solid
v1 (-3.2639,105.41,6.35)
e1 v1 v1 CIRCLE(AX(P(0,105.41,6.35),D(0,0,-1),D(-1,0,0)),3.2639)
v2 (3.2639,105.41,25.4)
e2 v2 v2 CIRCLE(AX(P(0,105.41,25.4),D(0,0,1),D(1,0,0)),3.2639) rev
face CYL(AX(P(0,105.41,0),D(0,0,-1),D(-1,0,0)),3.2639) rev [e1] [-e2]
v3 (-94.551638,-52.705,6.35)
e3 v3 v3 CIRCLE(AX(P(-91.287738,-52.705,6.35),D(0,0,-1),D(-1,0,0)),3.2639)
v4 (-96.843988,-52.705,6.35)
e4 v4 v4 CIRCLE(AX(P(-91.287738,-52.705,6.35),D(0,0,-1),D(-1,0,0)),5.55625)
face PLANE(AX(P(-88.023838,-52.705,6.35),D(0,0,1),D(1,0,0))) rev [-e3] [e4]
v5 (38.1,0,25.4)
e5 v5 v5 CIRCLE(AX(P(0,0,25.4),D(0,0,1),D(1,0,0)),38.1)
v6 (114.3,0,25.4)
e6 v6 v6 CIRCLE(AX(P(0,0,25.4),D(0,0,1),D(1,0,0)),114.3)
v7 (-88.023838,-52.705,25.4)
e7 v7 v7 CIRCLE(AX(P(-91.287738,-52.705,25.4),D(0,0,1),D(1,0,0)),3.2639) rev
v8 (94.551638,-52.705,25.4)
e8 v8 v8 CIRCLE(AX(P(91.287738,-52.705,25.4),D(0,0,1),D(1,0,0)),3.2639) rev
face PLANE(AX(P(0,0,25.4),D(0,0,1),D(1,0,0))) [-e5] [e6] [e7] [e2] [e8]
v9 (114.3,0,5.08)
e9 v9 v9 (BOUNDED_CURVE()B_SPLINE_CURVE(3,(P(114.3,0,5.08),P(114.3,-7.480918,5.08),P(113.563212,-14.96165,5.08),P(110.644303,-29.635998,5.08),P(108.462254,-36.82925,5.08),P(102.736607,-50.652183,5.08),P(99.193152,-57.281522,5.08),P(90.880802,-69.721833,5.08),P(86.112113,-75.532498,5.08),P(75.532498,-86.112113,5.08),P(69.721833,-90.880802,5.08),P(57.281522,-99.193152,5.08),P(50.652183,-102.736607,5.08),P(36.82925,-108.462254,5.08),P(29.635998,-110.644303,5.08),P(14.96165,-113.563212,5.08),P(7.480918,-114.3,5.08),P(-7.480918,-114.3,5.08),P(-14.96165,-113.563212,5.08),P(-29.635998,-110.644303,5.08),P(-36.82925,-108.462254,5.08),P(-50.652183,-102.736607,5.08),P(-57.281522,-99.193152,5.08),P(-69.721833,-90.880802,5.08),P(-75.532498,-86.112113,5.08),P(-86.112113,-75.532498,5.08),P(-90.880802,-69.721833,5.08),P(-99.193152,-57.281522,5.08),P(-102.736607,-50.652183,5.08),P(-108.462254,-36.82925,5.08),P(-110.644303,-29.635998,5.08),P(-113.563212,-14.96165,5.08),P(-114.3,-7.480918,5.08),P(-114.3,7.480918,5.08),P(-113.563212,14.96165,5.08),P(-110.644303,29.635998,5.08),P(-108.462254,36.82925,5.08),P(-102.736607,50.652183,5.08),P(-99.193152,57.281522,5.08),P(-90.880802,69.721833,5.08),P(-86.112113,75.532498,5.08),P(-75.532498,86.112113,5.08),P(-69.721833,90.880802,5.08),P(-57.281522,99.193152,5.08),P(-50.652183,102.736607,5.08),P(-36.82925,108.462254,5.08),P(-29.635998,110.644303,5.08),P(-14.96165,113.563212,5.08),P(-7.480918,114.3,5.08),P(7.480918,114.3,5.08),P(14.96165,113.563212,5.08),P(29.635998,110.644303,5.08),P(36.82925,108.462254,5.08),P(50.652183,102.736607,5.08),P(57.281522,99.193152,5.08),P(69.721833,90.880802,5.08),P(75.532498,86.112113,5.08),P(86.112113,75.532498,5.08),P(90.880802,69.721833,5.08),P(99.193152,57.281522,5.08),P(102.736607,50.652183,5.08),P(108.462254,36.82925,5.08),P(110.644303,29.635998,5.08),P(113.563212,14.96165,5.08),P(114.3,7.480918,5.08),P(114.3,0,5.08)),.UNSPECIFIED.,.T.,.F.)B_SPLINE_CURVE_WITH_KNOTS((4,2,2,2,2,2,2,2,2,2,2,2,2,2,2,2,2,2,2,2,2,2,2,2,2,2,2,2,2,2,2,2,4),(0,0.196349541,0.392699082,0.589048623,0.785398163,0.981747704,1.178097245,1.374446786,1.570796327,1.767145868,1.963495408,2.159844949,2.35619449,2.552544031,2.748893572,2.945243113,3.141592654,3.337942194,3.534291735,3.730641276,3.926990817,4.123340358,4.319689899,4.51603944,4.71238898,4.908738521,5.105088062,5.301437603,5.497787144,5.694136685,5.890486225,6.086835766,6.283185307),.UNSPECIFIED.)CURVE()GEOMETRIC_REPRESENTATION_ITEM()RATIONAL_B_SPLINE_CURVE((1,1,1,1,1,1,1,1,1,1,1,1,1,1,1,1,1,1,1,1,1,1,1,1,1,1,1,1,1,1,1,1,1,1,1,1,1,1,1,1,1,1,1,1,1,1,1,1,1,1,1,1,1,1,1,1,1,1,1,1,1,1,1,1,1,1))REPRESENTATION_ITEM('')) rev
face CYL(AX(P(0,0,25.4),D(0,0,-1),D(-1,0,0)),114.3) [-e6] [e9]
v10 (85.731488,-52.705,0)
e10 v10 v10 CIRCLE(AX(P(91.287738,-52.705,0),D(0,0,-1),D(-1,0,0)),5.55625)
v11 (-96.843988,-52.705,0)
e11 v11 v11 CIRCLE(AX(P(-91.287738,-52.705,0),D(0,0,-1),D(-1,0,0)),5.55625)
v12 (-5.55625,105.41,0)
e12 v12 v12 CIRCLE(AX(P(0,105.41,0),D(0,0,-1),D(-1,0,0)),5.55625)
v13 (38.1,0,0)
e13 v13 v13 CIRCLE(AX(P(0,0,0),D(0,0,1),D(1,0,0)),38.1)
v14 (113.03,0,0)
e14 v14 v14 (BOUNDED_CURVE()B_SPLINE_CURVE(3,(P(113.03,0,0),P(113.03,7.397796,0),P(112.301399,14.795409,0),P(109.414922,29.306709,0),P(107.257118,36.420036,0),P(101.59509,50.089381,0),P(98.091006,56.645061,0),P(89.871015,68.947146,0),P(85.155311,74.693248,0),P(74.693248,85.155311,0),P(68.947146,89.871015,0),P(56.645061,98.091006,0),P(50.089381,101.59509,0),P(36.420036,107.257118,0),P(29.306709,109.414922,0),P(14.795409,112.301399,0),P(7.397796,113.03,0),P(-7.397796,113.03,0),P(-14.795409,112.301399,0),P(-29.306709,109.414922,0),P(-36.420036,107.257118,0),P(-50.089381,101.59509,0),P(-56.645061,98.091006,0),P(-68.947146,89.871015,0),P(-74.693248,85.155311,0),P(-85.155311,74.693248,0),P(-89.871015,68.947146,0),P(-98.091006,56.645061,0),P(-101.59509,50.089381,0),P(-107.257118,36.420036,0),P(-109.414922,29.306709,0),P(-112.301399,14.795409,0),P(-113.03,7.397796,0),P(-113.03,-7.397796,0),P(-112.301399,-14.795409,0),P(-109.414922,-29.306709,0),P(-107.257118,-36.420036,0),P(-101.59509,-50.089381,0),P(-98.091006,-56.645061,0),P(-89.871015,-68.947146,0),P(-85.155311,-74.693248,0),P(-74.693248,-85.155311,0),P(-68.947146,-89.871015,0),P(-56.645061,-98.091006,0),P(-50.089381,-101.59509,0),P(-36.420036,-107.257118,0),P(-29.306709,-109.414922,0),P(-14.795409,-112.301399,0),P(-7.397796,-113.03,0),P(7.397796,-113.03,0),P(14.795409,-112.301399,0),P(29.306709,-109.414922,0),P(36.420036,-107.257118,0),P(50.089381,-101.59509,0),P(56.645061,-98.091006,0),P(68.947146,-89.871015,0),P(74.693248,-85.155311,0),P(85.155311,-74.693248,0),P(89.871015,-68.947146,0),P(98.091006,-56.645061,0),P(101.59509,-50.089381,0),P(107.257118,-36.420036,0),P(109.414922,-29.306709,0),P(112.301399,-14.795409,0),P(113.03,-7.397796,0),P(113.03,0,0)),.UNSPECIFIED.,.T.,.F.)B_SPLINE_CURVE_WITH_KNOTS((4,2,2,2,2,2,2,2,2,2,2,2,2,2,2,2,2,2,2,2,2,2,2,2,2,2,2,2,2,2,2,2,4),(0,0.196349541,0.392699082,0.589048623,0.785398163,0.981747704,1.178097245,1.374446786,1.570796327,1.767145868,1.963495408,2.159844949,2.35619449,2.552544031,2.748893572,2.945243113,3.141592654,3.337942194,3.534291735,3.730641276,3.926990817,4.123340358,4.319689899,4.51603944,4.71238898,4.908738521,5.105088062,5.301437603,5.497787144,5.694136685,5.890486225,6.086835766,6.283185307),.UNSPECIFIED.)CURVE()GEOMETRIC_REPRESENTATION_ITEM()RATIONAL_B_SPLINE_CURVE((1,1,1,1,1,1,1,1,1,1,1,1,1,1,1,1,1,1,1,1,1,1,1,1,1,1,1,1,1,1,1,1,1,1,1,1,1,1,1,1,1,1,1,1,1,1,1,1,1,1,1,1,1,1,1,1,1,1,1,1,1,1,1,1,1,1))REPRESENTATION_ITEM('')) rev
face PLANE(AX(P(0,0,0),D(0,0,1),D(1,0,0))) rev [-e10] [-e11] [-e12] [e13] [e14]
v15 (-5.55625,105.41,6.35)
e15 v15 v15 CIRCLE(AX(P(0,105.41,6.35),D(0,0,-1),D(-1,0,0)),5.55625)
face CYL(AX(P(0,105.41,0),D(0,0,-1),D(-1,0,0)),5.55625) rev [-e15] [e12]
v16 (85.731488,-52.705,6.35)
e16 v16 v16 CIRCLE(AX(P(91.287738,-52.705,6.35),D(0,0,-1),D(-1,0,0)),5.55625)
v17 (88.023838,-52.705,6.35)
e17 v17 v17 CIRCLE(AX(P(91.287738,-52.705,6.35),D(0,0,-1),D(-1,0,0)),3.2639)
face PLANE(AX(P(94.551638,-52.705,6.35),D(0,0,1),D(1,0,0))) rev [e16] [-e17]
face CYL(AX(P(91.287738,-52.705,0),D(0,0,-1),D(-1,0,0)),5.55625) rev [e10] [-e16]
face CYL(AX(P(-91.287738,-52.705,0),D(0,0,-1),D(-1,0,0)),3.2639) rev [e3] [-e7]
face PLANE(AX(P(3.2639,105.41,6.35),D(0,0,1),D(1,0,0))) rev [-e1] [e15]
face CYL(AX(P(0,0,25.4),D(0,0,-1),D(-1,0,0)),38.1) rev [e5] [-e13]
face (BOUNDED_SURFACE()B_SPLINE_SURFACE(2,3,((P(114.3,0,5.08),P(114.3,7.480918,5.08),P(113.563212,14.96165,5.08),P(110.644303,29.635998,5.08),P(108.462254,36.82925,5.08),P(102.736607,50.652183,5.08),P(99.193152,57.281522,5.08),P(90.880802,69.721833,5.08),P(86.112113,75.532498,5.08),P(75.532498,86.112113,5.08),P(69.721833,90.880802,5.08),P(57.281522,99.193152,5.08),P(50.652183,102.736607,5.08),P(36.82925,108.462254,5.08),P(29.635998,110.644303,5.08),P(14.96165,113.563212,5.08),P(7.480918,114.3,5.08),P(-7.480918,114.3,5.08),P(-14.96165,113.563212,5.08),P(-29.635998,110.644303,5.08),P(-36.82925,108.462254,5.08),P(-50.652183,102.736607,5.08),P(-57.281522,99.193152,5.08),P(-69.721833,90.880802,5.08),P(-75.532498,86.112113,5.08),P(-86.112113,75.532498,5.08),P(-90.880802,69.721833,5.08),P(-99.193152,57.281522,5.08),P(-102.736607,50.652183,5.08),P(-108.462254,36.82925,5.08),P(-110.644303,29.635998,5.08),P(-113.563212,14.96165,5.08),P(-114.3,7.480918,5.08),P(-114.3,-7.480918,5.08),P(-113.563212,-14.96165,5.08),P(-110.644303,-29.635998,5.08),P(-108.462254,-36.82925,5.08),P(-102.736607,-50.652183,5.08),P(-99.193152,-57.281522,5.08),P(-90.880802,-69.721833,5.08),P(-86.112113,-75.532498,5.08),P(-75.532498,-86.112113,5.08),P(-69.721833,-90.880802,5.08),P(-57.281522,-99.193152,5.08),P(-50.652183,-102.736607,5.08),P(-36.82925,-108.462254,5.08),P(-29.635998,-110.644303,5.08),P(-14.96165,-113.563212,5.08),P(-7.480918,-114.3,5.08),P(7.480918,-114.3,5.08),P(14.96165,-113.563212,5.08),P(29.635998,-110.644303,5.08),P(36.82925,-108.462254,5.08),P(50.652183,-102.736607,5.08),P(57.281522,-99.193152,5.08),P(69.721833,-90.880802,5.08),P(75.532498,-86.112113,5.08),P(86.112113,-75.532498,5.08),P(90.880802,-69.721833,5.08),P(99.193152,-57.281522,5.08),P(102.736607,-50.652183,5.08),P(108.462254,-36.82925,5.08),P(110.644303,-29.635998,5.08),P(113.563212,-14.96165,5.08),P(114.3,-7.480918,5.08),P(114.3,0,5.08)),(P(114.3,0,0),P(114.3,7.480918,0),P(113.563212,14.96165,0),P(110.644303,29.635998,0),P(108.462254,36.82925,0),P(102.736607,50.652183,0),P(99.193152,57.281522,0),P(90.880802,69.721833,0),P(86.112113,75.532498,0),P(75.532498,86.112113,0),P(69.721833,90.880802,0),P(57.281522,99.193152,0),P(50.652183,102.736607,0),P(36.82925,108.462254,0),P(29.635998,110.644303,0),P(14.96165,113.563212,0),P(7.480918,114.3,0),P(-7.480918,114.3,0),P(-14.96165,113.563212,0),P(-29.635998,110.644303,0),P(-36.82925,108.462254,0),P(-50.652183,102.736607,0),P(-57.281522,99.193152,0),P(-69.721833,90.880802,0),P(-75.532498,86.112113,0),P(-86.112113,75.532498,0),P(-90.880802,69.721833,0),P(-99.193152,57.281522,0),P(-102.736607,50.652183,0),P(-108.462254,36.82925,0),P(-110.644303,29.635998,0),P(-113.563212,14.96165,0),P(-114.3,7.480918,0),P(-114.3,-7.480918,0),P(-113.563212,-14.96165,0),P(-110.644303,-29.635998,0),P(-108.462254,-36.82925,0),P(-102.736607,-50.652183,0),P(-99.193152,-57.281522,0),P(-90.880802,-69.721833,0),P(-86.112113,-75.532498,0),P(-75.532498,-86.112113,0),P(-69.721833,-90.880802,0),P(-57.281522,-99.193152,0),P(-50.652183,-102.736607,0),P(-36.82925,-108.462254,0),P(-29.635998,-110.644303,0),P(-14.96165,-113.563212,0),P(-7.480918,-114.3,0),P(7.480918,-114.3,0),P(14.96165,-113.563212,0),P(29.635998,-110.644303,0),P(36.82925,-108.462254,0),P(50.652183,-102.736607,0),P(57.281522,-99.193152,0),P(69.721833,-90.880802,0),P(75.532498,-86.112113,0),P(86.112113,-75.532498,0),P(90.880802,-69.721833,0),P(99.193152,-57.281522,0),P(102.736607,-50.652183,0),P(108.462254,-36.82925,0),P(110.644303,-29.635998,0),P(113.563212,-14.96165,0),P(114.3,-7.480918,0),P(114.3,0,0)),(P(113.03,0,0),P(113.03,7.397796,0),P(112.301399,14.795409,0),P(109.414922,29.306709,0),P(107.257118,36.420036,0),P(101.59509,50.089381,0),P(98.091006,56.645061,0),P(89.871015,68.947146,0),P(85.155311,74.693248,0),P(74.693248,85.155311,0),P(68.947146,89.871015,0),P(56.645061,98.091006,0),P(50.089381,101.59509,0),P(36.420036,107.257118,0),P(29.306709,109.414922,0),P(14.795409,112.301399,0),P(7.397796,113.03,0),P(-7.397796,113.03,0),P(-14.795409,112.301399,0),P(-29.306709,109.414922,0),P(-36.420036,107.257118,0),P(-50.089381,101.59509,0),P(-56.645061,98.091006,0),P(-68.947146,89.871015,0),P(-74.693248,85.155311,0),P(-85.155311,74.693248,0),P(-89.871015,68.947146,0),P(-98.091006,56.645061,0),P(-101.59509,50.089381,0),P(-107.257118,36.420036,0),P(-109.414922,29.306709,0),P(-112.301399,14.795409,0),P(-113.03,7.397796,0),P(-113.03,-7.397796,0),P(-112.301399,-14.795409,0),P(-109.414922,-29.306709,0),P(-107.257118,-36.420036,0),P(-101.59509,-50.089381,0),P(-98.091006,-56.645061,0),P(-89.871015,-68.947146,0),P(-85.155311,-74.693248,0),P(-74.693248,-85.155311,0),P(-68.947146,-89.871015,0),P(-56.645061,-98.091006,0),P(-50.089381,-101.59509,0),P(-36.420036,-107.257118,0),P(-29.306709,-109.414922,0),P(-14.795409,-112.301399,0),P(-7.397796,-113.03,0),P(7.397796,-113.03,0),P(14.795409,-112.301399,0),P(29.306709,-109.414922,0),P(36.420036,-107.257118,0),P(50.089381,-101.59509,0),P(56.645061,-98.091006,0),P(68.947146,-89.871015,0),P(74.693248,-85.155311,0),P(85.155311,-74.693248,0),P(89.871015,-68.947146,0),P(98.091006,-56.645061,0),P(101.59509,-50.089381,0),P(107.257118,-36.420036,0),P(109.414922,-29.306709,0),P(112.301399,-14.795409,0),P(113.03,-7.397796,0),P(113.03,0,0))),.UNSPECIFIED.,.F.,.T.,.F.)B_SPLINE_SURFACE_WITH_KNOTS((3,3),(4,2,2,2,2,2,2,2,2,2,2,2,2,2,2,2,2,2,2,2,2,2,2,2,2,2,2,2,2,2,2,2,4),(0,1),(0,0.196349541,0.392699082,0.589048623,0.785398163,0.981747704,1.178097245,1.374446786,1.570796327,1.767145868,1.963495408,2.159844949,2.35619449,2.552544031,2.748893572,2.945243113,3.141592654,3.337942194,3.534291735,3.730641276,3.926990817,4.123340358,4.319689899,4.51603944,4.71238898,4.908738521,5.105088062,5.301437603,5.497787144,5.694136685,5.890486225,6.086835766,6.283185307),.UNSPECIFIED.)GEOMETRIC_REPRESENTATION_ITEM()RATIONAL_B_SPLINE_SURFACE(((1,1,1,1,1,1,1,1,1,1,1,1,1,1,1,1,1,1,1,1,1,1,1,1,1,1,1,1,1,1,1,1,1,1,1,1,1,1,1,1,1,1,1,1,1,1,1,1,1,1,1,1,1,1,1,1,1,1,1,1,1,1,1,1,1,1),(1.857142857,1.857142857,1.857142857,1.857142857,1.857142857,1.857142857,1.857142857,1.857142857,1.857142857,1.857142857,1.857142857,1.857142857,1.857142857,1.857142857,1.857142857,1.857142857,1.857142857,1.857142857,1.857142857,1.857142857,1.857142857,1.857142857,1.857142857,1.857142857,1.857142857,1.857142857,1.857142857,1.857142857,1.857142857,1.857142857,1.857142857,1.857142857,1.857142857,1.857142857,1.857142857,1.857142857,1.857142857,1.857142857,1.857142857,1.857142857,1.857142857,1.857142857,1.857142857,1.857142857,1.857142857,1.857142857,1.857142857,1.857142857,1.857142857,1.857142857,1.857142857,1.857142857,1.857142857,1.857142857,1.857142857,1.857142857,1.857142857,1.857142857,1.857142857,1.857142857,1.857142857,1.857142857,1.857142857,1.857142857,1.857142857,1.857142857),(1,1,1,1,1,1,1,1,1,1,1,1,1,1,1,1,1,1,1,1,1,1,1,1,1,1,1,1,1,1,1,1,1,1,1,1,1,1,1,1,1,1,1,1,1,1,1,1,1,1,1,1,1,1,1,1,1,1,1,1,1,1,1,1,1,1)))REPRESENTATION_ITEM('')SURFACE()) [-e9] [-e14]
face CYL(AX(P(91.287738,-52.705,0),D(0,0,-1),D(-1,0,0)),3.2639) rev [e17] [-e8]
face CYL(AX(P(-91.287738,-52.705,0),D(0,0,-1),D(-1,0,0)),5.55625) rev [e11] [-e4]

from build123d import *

# Parameters (mm, degrees)
SKETCH1_R           = 114.3
SKETCH1_R_2         = 38.1
BOSS_EXTRUDE1_DEPTH = 25.4
CIRPATTERN1_COUNT   = 3
FILLET1_SIZE        = 5.08
FILLET1_SIZE_2      = 1.27


with BuildPart() as part:
    # Sketch1 → Boss-Extrude1 (new body)
    with BuildSketch(Plane.XY):
        Circle(SKETCH1_R)
        Circle(SKETCH1_R_2, mode=Mode.SUBTRACT)
    extrude(amount=BOSS_EXTRUDE1_DEPTH)

    # Sketch5 → CBORE for 1/4 Socket Head Cap Screw1 (revolve, cut)
    with BuildSketch(Plane(origin=(0, 105.41, 0), x_dir=(0, 1, 0), z_dir=(1, 0, 0))):
        Polygon((0, 0), (0, 27.361148974), (3.2639, 25.4), (3.2639, 6.35), (5.55625, 6.35), (5.55625, 0), align=None)
    cbore_for_1_4_socket_head_cap_screw1 = revolve(axis=Axis((0, 105.41, -6.35), (0, 0, 1)), mode=Mode.SUBTRACT)

    # CirPattern1: CBORE for 1/4 Socket Head Cap Screw1 ×3 about axis
    cirpattern1_axis = Axis((0, 0, 0), (0, 0, 1))
    for i in range(1, CIRPATTERN1_COUNT):
        add(cbore_for_1_4_socket_head_cap_screw1.rotate(cirpattern1_axis, i * 360 / CIRPATTERN1_COUNT), mode=Mode.SUBTRACT)

    # Fillet1
    # a fillet whose section is not a circle: 5.08, 1.27 mm, written as the material it takes off along each edge
    with BuildSketch(Plane(origin=(0, 0, 0), x_dir=(1, 0, 0), z_dir=(0, -1, 0))) as fillet1_piece_1:
        with BuildLine():
            Bezier((114.3, FILLET1_SIZE), (114.3, 0), (114.3 - FILLET1_SIZE_2, 0), weights=[1, 1.857142857, 1])
            Line((114.3 - FILLET1_SIZE_2, 0), (113.03, -0.1016))
            Line((113.03, -0.1016), (114.4016, -0.1016))
            Line((114.4016, -0.1016), (114.4016, 5.08))
            Line((114.4016, 5.08), (114.3, FILLET1_SIZE))
        make_face()
    revolve(axis=Axis((0, 0, 0), (0, 0, 1)), mode=Mode.SUBTRACT)


solid = part.part
